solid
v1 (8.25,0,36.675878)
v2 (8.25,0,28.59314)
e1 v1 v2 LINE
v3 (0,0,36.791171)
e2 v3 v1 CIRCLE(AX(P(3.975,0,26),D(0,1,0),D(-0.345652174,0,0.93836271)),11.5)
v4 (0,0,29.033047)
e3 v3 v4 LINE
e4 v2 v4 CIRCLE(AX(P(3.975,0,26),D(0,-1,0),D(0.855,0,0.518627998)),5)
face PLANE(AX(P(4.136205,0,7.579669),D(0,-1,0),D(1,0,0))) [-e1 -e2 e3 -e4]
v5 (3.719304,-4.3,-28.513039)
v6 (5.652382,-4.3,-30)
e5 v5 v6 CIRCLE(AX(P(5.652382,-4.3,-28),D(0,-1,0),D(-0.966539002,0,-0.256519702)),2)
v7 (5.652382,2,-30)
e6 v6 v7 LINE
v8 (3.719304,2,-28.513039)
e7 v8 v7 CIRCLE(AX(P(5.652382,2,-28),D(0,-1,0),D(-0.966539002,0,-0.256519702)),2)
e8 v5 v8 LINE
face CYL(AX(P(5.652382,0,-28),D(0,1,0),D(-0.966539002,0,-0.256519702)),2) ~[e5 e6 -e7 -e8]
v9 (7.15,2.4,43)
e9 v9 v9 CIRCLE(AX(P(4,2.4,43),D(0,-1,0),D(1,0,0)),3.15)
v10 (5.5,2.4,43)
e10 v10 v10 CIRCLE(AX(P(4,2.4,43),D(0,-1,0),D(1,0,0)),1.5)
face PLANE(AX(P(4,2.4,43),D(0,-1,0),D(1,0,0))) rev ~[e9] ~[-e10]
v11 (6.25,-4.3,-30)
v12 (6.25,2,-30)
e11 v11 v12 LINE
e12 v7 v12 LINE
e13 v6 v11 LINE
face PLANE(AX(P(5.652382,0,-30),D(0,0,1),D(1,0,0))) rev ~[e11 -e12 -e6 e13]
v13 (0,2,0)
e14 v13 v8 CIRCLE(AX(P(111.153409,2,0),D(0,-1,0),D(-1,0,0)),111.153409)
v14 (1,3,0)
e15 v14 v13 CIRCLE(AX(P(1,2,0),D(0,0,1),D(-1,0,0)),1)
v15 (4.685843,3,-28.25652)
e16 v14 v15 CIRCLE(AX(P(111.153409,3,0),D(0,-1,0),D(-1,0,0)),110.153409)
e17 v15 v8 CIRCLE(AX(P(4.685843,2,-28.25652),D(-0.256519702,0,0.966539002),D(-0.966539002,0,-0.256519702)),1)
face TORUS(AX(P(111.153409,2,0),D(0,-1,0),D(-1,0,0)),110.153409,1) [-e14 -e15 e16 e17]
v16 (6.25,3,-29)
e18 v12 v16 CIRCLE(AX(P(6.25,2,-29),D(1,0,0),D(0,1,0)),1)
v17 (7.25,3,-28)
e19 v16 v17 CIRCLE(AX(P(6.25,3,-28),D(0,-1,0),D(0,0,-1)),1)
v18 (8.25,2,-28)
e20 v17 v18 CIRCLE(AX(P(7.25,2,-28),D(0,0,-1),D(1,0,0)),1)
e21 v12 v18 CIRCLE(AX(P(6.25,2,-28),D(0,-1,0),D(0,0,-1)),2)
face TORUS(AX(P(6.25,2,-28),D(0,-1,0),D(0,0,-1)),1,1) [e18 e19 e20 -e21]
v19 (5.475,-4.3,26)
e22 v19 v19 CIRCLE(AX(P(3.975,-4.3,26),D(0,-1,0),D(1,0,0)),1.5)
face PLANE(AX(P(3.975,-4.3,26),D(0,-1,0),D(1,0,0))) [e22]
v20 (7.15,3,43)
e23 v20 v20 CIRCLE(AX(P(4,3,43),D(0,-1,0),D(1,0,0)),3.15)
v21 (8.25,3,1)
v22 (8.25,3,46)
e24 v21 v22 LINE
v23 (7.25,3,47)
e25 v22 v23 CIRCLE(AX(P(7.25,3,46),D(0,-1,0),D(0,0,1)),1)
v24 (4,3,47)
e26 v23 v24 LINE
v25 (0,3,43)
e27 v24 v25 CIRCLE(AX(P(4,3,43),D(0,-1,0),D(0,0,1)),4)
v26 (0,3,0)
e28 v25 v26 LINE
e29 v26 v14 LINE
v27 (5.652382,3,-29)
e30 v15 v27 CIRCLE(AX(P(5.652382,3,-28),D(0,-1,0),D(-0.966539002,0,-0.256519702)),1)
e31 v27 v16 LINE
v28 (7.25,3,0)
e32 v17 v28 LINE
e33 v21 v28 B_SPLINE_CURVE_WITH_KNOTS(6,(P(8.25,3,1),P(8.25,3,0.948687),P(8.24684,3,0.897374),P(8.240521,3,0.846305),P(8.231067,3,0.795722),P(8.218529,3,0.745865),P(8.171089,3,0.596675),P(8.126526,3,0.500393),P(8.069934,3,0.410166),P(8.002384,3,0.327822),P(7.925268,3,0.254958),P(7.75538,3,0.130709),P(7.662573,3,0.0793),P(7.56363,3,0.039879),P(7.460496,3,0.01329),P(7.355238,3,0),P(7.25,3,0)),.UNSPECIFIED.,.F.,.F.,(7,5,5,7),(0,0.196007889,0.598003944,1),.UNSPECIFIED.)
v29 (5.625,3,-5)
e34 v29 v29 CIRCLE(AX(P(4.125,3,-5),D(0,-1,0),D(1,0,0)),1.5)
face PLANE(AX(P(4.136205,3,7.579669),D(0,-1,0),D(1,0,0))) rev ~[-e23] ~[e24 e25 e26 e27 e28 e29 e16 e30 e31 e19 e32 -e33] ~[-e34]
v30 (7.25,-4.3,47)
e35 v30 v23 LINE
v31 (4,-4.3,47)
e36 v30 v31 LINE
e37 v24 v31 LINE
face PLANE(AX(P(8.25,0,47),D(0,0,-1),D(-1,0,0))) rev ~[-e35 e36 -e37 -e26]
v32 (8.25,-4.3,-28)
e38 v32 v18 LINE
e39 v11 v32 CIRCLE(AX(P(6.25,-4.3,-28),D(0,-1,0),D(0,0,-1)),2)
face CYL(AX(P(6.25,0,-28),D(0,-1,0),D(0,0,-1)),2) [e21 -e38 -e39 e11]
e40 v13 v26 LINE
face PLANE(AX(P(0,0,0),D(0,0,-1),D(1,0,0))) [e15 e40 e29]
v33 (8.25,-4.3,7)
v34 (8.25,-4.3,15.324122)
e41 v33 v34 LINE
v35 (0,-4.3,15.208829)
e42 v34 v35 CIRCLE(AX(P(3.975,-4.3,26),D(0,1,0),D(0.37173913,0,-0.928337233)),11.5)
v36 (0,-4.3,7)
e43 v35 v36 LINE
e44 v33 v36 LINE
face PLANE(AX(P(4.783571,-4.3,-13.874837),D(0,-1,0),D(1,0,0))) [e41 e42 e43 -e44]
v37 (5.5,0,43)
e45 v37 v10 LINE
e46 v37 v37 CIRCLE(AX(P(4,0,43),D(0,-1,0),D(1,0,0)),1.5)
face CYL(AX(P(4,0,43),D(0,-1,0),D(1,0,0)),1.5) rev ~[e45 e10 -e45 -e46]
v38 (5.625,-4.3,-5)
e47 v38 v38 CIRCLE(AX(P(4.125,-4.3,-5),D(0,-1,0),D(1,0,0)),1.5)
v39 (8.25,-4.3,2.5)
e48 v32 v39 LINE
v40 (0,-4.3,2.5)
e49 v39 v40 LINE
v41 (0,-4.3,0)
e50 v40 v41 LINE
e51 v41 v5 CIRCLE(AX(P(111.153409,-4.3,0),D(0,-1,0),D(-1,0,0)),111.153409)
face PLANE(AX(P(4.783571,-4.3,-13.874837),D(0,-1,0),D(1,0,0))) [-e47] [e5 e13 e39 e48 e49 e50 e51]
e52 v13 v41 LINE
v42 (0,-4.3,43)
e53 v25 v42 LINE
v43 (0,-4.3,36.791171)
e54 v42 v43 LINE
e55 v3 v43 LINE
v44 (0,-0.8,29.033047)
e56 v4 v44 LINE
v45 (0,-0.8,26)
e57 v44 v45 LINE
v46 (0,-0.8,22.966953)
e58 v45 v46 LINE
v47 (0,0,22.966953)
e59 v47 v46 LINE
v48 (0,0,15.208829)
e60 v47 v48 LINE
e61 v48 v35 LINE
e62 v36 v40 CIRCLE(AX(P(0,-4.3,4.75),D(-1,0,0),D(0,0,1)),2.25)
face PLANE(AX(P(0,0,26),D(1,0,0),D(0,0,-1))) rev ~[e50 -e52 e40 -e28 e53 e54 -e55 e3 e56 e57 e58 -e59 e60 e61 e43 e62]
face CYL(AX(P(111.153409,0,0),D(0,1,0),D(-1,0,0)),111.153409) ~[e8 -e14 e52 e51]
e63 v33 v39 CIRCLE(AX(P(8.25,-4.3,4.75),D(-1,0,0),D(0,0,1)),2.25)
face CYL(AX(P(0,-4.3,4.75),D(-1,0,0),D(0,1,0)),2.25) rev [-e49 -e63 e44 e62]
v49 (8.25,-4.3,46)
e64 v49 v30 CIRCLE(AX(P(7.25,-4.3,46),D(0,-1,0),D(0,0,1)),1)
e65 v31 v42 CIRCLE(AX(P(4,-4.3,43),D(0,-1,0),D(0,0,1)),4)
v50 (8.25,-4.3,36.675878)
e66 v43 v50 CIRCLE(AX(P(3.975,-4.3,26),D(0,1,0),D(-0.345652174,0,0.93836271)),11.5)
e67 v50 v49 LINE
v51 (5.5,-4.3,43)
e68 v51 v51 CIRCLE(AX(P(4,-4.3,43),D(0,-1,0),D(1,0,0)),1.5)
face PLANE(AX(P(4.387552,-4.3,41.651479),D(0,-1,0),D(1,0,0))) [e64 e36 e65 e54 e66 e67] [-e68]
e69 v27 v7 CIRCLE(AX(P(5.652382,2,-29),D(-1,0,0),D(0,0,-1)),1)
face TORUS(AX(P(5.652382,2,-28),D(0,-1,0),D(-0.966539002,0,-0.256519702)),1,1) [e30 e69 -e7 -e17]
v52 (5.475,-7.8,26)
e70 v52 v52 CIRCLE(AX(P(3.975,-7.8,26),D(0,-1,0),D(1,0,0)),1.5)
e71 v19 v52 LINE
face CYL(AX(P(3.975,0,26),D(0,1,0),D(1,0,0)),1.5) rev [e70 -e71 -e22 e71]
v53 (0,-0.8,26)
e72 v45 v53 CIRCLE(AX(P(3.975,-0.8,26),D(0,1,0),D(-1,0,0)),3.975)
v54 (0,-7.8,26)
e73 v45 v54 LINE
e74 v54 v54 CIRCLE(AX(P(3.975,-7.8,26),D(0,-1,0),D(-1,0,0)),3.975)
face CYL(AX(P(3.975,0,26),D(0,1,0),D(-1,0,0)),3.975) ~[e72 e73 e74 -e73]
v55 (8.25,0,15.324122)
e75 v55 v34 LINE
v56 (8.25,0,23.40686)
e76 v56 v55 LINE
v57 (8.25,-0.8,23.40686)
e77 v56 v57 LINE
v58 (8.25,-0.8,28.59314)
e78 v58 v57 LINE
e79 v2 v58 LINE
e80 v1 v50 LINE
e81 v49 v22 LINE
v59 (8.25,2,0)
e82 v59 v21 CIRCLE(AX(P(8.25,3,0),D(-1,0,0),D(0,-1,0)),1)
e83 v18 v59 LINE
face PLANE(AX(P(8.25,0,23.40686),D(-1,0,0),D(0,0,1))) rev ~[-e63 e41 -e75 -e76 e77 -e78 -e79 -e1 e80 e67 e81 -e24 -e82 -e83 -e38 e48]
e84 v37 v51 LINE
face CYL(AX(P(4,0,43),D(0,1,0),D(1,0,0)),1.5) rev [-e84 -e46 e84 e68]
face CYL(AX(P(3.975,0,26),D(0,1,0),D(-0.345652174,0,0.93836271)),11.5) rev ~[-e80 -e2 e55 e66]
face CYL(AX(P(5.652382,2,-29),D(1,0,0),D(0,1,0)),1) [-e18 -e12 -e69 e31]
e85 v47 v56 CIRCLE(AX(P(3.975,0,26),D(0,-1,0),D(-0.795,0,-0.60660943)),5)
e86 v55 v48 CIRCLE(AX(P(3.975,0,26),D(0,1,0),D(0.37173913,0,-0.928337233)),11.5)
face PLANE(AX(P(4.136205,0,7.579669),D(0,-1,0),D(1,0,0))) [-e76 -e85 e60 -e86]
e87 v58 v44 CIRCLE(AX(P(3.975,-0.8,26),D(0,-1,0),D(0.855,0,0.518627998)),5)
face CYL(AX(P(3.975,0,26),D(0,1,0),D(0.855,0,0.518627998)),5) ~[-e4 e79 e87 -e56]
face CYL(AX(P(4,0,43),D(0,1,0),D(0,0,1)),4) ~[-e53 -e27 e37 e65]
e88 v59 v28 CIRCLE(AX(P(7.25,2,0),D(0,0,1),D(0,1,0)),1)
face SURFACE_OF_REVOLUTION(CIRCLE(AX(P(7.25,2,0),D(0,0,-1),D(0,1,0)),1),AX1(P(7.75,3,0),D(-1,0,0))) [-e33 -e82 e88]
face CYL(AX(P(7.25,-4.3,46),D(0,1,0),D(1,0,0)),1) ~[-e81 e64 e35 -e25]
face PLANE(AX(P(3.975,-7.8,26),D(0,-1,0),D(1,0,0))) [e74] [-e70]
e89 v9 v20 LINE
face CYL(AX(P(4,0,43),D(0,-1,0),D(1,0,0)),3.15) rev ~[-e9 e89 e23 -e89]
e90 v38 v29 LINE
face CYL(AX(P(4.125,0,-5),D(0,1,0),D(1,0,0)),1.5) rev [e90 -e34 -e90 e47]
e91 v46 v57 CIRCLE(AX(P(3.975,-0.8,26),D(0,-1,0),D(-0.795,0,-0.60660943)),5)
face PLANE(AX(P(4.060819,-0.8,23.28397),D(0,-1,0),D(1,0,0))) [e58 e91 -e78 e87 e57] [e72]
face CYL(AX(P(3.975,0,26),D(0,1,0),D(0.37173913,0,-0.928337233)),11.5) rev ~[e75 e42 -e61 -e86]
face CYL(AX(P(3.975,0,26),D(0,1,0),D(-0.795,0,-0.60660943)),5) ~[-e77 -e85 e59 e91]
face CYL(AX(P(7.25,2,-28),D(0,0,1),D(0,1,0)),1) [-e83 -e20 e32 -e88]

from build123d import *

# Parameters (mm, degrees)
F0_R      = 1.5
F3_DEPTH  = 3
F0_R_2    = 3.15
F5_DEPTH  = 3
F6_DEPTH  = 4.3
F7_DEPTH  = 7.8
F8_DEPTH  = 0.8
F1_R      = 2.25
F9_DEPTH  = 88
F10_DEPTH = 0.8
F12_R     = 1
F13_DEPTH = 2.4


# Not quite as in the source:
# - an extrude ends at something that could not be found from the text; its depth is read off the source's solid


with BuildPart() as f3:
    # F0 (on Front) → F3 (new body)
    with BuildSketch(Plane.XZ):
        with BuildLine():
            Line((8.25, -28), (8.25, 0))
            Line((8.25, 0), (0, 0))
            ThreePointArc((0, 0), (0.9337479911, -14.3772966716), (3.7193040011, -28.5130394045))
            ThreePointArc((3.7193040011, -28.5130394045), (4.4329720676, -29.5852568891), (5.6523820051, -30))
            Line((5.6523820051, -30), (6.25, -30))
            ThreePointArc((6.25, -30), (7.6642135624, -29.4142135624), (8.25, -28))
        make_face()
        with Locations((4.125, -5)):
            Circle(F0_R, mode=Mode.SUBTRACT)
    extrude(amount=-F3_DEPTH)

    # F4: sweep along a path in F4_path
    with BuildLine(Plane(origin=(3.7193040011, 3, -28.5130394045), x_dir=(0, 0, 1), z_dir=(0, -1, 0))) as f4_path:
        ThreePointArc((28.5130394045, 3.7193040011), (14.1357427329, 2.78555601), (0, 0))
        ThreePointArc((0, 0), (-1.0722174846, -0.7136680665), (-1.4869605955, -1.933078004))
        Line((-1.4869605955, -1.933078004), (-1.4869605955, -2.5306959989))
        ThreePointArc((-1.4869605955, -2.5306959989), (-0.9011741579, -3.9449095613), (0.5130394045, -4.5306959989))
        Line((0.5130394045, -4.5306959989), (28.5130394045, -4.5306959989))
    # F2 (on Top) → F4 (sweep, cut)
    with BuildSketch(Plane.XY):
        with BuildLine():
            ThreePointArc((7.25, 3), (7.9571067812, 2.7071067812), (8.25, 2))
            Line((8.25, 2), (8.25, 3))
            Line((8.25, 3), (7.25, 3))
        make_face()
    sweep(path=f4_path.line, mode=Mode.SUBTRACT)

    # F0 (on Front) → F5 (join, through all)
    with BuildSketch(Plane.XZ):
        with BuildLine():
            Line((8.25, 0), (8.25, 15.324121816))
            ThreePointArc((8.25, 15.324121816), (4.1356957298, 14.5011227991), (0, 15.2088288402))
            Line((0, 15.2088288402), (0, 0))
            Line((0, 0), (8.25, 0))
        make_face()
        with BuildLine():
            Line((8.25, 15.324121816), (8.25, 23.4068600115))
            ThreePointArc((8.25, 23.4068600115), (4.2412321866, 21.0070929888), (0, 22.9669528523))
            Line((0, 22.9669528523), (0, 15.2088288402))
            ThreePointArc((0, 15.2088288402), (4.1356957298, 14.5011227991), (8.25, 15.324121816))
        make_face()
        with BuildLine():
            Line((8.25, 23.4068600115), (8.25, 26))
            Line((8.25, 26), (7.95, 26))
            ThreePointArc((7.95, 26), (3.975, 22.025), (0, 26))
            Line((0, 26), (0, 22.9669528523))
            ThreePointArc((0, 22.9669528523), (4.2412321866, 21.0070929888), (8.25, 23.4068600115))
        make_face()
        with BuildLine():
            ThreePointArc((7.95, 26), (3.975, 29.975), (0, 26))
            ThreePointArc((0, 26), (3.975, 22.025), (7.95, 26))
        make_face()
        with Locations((3.975, 26)):
            Circle(F0_R, mode=Mode.SUBTRACT)
        with Locations((3.975, 26)):
            Circle(F0_R)
        with BuildLine():
            Line((8.25, 26), (8.25, 28.5931399885))
            ThreePointArc((8.25, 28.5931399885), (4.2412321866, 30.9929070112), (0, 29.0330471477))
            Line((0, 29.0330471477), (0, 26))
            ThreePointArc((0, 26), (3.975, 29.975), (7.95, 26))
            Line((7.95, 26), (8.25, 26))
        make_face()
        with BuildLine():
            Line((8.25, 28.5931399885), (8.25, 36.675878184))
            ThreePointArc((8.25, 36.675878184), (4.1356957298, 37.4988772009), (0, 36.7911711598))
            Line((0, 36.7911711598), (0, 29.0330471477))
            ThreePointArc((0, 29.0330471477), (4.2412321866, 30.9929070112), (8.25, 28.5931399885))
        make_face()
        with BuildLine():
            Line((8.25, 47), (4, 47))
            ThreePointArc((4, 47), (1.1715728753, 45.8284271247), (0, 43))
            Line((0, 43), (0, 36.7911711598))
            ThreePointArc((0, 36.7911711598), (4.1356957298, 37.4988772009), (8.25, 36.675878184))
            Line((8.25, 36.675878184), (8.25, 47))
        make_face()
        with Locations((4, 43)):
            Circle(F0_R_2, mode=Mode.SUBTRACT)
    extrude(amount=-F5_DEPTH)

    # F0 (on Front) → F6 (join)
    with BuildSketch(Plane.XZ):
        with BuildLine():
            Line((8.25, 47), (4, 47))
            ThreePointArc((4, 47), (1.1715728753, 45.8284271247), (0, 43))
            Line((0, 43), (0, 36.7911711598))
            ThreePointArc((0, 36.7911711598), (4.1356957298, 37.4988772009), (8.25, 36.675878184))
            Line((8.25, 36.675878184), (8.25, 47))
        make_face()
        with Locations((4, 43)):
            Circle(F0_R_2, mode=Mode.SUBTRACT)
        with BuildLine():
            Line((8.25, -28), (8.25, 0))
            Line((8.25, 0), (0, 0))
            ThreePointArc((0, 0), (0.9337479911, -14.3772966716), (3.7193040011, -28.5130394045))
            ThreePointArc((3.7193040011, -28.5130394045), (4.4329720676, -29.5852568891), (5.6523820051, -30))
            Line((5.6523820051, -30), (6.25, -30))
            ThreePointArc((6.25, -30), (7.6642135624, -29.4142135624), (8.25, -28))
        make_face()
        with Locations((4.125, -5)):
            Circle(F0_R, mode=Mode.SUBTRACT)
        with Locations((3.975, 26)):
            Circle(F0_R)
        with BuildLine():
            Line((8.25, 0), (8.25, 15.324121816))
            ThreePointArc((8.25, 15.324121816), (4.1356957298, 14.5011227991), (0, 15.2088288402))
            Line((0, 15.2088288402), (0, 0))
            Line((0, 0), (8.25, 0))
        make_face()
        with Locations((4, 43)):
            Circle(F0_R_2)
        with Locations((4, 43)):
            Circle(F0_R, mode=Mode.SUBTRACT)
    extrude(amount=F6_DEPTH)

    # F0 (on Front) → F7 (join)
    with BuildSketch(Plane.XZ):
        with BuildLine():
            ThreePointArc((7.95, 26), (3.975, 29.975), (0, 26))
            ThreePointArc((0, 26), (3.975, 22.025), (7.95, 26))
        make_face()
        with Locations((3.975, 26)):
            Circle(F0_R, mode=Mode.SUBTRACT)
    extrude(amount=F7_DEPTH)

    # F0 (on Front) → F8 (join)
    with BuildSketch(Plane.XZ):
        with BuildLine():
            Line((8.25, 26), (8.25, 28.5931399885))
            ThreePointArc((8.25, 28.5931399885), (4.2412321866, 30.9929070112), (0, 29.0330471477))
            Line((0, 29.0330471477), (0, 26))
            ThreePointArc((0, 26), (3.975, 29.975), (7.95, 26))
            Line((7.95, 26), (8.25, 26))
        make_face()
    extrude(amount=F8_DEPTH)

    # F1 (on Right) → F9 (cut, through all)
    with BuildSketch(Plane.YZ):
        with Locations((-4.3, 4.75)):
            Circle(F1_R)
    extrude(amount=F9_DEPTH, mode=Mode.SUBTRACT)

    # F0 (on Front) → F10 (join)
    with BuildSketch(Plane.XZ):
        with BuildLine():
            Line((8.25, 23.4068600115), (8.25, 26))
            Line((8.25, 26), (7.95, 26))
            ThreePointArc((7.95, 26), (3.975, 22.025), (0, 26))
            Line((0, 26), (0, 22.9669528523))
            ThreePointArc((0, 22.9669528523), (4.2412321866, 21.0070929888), (8.25, 23.4068600115))
        make_face()
    extrude(amount=F10_DEPTH)

    # F2 (on Top) → F11 (revolve, cut)
    with BuildSketch(Plane.XY):
        with BuildLine():
            ThreePointArc((7.25, 3), (7.9571067812, 2.7071067812), (8.25, 2))
            Line((8.25, 2), (8.25, 3))
            Line((8.25, 3), (7.25, 3))
        make_face()
    revolve(axis=Axis((7.75, 3, 0), (-1, 0, 0)), mode=Mode.SUBTRACT)

    # F12
    f12_edges = [f3.edges().sort_by_distance(p)[0] for p in [
        (8.25, -0.65, 47),
    ]]
    fillet(f12_edges, radius=F12_R)

    # F0 (on Front) → F13 (join)
    with BuildSketch(Plane.XZ):
        with Locations((4, 43)):
            Circle(F0_R_2)
        with Locations((4, 43)):
            Circle(F0_R, mode=Mode.SUBTRACT)
    extrude(amount=-F13_DEPTH)


solid = f3.part
